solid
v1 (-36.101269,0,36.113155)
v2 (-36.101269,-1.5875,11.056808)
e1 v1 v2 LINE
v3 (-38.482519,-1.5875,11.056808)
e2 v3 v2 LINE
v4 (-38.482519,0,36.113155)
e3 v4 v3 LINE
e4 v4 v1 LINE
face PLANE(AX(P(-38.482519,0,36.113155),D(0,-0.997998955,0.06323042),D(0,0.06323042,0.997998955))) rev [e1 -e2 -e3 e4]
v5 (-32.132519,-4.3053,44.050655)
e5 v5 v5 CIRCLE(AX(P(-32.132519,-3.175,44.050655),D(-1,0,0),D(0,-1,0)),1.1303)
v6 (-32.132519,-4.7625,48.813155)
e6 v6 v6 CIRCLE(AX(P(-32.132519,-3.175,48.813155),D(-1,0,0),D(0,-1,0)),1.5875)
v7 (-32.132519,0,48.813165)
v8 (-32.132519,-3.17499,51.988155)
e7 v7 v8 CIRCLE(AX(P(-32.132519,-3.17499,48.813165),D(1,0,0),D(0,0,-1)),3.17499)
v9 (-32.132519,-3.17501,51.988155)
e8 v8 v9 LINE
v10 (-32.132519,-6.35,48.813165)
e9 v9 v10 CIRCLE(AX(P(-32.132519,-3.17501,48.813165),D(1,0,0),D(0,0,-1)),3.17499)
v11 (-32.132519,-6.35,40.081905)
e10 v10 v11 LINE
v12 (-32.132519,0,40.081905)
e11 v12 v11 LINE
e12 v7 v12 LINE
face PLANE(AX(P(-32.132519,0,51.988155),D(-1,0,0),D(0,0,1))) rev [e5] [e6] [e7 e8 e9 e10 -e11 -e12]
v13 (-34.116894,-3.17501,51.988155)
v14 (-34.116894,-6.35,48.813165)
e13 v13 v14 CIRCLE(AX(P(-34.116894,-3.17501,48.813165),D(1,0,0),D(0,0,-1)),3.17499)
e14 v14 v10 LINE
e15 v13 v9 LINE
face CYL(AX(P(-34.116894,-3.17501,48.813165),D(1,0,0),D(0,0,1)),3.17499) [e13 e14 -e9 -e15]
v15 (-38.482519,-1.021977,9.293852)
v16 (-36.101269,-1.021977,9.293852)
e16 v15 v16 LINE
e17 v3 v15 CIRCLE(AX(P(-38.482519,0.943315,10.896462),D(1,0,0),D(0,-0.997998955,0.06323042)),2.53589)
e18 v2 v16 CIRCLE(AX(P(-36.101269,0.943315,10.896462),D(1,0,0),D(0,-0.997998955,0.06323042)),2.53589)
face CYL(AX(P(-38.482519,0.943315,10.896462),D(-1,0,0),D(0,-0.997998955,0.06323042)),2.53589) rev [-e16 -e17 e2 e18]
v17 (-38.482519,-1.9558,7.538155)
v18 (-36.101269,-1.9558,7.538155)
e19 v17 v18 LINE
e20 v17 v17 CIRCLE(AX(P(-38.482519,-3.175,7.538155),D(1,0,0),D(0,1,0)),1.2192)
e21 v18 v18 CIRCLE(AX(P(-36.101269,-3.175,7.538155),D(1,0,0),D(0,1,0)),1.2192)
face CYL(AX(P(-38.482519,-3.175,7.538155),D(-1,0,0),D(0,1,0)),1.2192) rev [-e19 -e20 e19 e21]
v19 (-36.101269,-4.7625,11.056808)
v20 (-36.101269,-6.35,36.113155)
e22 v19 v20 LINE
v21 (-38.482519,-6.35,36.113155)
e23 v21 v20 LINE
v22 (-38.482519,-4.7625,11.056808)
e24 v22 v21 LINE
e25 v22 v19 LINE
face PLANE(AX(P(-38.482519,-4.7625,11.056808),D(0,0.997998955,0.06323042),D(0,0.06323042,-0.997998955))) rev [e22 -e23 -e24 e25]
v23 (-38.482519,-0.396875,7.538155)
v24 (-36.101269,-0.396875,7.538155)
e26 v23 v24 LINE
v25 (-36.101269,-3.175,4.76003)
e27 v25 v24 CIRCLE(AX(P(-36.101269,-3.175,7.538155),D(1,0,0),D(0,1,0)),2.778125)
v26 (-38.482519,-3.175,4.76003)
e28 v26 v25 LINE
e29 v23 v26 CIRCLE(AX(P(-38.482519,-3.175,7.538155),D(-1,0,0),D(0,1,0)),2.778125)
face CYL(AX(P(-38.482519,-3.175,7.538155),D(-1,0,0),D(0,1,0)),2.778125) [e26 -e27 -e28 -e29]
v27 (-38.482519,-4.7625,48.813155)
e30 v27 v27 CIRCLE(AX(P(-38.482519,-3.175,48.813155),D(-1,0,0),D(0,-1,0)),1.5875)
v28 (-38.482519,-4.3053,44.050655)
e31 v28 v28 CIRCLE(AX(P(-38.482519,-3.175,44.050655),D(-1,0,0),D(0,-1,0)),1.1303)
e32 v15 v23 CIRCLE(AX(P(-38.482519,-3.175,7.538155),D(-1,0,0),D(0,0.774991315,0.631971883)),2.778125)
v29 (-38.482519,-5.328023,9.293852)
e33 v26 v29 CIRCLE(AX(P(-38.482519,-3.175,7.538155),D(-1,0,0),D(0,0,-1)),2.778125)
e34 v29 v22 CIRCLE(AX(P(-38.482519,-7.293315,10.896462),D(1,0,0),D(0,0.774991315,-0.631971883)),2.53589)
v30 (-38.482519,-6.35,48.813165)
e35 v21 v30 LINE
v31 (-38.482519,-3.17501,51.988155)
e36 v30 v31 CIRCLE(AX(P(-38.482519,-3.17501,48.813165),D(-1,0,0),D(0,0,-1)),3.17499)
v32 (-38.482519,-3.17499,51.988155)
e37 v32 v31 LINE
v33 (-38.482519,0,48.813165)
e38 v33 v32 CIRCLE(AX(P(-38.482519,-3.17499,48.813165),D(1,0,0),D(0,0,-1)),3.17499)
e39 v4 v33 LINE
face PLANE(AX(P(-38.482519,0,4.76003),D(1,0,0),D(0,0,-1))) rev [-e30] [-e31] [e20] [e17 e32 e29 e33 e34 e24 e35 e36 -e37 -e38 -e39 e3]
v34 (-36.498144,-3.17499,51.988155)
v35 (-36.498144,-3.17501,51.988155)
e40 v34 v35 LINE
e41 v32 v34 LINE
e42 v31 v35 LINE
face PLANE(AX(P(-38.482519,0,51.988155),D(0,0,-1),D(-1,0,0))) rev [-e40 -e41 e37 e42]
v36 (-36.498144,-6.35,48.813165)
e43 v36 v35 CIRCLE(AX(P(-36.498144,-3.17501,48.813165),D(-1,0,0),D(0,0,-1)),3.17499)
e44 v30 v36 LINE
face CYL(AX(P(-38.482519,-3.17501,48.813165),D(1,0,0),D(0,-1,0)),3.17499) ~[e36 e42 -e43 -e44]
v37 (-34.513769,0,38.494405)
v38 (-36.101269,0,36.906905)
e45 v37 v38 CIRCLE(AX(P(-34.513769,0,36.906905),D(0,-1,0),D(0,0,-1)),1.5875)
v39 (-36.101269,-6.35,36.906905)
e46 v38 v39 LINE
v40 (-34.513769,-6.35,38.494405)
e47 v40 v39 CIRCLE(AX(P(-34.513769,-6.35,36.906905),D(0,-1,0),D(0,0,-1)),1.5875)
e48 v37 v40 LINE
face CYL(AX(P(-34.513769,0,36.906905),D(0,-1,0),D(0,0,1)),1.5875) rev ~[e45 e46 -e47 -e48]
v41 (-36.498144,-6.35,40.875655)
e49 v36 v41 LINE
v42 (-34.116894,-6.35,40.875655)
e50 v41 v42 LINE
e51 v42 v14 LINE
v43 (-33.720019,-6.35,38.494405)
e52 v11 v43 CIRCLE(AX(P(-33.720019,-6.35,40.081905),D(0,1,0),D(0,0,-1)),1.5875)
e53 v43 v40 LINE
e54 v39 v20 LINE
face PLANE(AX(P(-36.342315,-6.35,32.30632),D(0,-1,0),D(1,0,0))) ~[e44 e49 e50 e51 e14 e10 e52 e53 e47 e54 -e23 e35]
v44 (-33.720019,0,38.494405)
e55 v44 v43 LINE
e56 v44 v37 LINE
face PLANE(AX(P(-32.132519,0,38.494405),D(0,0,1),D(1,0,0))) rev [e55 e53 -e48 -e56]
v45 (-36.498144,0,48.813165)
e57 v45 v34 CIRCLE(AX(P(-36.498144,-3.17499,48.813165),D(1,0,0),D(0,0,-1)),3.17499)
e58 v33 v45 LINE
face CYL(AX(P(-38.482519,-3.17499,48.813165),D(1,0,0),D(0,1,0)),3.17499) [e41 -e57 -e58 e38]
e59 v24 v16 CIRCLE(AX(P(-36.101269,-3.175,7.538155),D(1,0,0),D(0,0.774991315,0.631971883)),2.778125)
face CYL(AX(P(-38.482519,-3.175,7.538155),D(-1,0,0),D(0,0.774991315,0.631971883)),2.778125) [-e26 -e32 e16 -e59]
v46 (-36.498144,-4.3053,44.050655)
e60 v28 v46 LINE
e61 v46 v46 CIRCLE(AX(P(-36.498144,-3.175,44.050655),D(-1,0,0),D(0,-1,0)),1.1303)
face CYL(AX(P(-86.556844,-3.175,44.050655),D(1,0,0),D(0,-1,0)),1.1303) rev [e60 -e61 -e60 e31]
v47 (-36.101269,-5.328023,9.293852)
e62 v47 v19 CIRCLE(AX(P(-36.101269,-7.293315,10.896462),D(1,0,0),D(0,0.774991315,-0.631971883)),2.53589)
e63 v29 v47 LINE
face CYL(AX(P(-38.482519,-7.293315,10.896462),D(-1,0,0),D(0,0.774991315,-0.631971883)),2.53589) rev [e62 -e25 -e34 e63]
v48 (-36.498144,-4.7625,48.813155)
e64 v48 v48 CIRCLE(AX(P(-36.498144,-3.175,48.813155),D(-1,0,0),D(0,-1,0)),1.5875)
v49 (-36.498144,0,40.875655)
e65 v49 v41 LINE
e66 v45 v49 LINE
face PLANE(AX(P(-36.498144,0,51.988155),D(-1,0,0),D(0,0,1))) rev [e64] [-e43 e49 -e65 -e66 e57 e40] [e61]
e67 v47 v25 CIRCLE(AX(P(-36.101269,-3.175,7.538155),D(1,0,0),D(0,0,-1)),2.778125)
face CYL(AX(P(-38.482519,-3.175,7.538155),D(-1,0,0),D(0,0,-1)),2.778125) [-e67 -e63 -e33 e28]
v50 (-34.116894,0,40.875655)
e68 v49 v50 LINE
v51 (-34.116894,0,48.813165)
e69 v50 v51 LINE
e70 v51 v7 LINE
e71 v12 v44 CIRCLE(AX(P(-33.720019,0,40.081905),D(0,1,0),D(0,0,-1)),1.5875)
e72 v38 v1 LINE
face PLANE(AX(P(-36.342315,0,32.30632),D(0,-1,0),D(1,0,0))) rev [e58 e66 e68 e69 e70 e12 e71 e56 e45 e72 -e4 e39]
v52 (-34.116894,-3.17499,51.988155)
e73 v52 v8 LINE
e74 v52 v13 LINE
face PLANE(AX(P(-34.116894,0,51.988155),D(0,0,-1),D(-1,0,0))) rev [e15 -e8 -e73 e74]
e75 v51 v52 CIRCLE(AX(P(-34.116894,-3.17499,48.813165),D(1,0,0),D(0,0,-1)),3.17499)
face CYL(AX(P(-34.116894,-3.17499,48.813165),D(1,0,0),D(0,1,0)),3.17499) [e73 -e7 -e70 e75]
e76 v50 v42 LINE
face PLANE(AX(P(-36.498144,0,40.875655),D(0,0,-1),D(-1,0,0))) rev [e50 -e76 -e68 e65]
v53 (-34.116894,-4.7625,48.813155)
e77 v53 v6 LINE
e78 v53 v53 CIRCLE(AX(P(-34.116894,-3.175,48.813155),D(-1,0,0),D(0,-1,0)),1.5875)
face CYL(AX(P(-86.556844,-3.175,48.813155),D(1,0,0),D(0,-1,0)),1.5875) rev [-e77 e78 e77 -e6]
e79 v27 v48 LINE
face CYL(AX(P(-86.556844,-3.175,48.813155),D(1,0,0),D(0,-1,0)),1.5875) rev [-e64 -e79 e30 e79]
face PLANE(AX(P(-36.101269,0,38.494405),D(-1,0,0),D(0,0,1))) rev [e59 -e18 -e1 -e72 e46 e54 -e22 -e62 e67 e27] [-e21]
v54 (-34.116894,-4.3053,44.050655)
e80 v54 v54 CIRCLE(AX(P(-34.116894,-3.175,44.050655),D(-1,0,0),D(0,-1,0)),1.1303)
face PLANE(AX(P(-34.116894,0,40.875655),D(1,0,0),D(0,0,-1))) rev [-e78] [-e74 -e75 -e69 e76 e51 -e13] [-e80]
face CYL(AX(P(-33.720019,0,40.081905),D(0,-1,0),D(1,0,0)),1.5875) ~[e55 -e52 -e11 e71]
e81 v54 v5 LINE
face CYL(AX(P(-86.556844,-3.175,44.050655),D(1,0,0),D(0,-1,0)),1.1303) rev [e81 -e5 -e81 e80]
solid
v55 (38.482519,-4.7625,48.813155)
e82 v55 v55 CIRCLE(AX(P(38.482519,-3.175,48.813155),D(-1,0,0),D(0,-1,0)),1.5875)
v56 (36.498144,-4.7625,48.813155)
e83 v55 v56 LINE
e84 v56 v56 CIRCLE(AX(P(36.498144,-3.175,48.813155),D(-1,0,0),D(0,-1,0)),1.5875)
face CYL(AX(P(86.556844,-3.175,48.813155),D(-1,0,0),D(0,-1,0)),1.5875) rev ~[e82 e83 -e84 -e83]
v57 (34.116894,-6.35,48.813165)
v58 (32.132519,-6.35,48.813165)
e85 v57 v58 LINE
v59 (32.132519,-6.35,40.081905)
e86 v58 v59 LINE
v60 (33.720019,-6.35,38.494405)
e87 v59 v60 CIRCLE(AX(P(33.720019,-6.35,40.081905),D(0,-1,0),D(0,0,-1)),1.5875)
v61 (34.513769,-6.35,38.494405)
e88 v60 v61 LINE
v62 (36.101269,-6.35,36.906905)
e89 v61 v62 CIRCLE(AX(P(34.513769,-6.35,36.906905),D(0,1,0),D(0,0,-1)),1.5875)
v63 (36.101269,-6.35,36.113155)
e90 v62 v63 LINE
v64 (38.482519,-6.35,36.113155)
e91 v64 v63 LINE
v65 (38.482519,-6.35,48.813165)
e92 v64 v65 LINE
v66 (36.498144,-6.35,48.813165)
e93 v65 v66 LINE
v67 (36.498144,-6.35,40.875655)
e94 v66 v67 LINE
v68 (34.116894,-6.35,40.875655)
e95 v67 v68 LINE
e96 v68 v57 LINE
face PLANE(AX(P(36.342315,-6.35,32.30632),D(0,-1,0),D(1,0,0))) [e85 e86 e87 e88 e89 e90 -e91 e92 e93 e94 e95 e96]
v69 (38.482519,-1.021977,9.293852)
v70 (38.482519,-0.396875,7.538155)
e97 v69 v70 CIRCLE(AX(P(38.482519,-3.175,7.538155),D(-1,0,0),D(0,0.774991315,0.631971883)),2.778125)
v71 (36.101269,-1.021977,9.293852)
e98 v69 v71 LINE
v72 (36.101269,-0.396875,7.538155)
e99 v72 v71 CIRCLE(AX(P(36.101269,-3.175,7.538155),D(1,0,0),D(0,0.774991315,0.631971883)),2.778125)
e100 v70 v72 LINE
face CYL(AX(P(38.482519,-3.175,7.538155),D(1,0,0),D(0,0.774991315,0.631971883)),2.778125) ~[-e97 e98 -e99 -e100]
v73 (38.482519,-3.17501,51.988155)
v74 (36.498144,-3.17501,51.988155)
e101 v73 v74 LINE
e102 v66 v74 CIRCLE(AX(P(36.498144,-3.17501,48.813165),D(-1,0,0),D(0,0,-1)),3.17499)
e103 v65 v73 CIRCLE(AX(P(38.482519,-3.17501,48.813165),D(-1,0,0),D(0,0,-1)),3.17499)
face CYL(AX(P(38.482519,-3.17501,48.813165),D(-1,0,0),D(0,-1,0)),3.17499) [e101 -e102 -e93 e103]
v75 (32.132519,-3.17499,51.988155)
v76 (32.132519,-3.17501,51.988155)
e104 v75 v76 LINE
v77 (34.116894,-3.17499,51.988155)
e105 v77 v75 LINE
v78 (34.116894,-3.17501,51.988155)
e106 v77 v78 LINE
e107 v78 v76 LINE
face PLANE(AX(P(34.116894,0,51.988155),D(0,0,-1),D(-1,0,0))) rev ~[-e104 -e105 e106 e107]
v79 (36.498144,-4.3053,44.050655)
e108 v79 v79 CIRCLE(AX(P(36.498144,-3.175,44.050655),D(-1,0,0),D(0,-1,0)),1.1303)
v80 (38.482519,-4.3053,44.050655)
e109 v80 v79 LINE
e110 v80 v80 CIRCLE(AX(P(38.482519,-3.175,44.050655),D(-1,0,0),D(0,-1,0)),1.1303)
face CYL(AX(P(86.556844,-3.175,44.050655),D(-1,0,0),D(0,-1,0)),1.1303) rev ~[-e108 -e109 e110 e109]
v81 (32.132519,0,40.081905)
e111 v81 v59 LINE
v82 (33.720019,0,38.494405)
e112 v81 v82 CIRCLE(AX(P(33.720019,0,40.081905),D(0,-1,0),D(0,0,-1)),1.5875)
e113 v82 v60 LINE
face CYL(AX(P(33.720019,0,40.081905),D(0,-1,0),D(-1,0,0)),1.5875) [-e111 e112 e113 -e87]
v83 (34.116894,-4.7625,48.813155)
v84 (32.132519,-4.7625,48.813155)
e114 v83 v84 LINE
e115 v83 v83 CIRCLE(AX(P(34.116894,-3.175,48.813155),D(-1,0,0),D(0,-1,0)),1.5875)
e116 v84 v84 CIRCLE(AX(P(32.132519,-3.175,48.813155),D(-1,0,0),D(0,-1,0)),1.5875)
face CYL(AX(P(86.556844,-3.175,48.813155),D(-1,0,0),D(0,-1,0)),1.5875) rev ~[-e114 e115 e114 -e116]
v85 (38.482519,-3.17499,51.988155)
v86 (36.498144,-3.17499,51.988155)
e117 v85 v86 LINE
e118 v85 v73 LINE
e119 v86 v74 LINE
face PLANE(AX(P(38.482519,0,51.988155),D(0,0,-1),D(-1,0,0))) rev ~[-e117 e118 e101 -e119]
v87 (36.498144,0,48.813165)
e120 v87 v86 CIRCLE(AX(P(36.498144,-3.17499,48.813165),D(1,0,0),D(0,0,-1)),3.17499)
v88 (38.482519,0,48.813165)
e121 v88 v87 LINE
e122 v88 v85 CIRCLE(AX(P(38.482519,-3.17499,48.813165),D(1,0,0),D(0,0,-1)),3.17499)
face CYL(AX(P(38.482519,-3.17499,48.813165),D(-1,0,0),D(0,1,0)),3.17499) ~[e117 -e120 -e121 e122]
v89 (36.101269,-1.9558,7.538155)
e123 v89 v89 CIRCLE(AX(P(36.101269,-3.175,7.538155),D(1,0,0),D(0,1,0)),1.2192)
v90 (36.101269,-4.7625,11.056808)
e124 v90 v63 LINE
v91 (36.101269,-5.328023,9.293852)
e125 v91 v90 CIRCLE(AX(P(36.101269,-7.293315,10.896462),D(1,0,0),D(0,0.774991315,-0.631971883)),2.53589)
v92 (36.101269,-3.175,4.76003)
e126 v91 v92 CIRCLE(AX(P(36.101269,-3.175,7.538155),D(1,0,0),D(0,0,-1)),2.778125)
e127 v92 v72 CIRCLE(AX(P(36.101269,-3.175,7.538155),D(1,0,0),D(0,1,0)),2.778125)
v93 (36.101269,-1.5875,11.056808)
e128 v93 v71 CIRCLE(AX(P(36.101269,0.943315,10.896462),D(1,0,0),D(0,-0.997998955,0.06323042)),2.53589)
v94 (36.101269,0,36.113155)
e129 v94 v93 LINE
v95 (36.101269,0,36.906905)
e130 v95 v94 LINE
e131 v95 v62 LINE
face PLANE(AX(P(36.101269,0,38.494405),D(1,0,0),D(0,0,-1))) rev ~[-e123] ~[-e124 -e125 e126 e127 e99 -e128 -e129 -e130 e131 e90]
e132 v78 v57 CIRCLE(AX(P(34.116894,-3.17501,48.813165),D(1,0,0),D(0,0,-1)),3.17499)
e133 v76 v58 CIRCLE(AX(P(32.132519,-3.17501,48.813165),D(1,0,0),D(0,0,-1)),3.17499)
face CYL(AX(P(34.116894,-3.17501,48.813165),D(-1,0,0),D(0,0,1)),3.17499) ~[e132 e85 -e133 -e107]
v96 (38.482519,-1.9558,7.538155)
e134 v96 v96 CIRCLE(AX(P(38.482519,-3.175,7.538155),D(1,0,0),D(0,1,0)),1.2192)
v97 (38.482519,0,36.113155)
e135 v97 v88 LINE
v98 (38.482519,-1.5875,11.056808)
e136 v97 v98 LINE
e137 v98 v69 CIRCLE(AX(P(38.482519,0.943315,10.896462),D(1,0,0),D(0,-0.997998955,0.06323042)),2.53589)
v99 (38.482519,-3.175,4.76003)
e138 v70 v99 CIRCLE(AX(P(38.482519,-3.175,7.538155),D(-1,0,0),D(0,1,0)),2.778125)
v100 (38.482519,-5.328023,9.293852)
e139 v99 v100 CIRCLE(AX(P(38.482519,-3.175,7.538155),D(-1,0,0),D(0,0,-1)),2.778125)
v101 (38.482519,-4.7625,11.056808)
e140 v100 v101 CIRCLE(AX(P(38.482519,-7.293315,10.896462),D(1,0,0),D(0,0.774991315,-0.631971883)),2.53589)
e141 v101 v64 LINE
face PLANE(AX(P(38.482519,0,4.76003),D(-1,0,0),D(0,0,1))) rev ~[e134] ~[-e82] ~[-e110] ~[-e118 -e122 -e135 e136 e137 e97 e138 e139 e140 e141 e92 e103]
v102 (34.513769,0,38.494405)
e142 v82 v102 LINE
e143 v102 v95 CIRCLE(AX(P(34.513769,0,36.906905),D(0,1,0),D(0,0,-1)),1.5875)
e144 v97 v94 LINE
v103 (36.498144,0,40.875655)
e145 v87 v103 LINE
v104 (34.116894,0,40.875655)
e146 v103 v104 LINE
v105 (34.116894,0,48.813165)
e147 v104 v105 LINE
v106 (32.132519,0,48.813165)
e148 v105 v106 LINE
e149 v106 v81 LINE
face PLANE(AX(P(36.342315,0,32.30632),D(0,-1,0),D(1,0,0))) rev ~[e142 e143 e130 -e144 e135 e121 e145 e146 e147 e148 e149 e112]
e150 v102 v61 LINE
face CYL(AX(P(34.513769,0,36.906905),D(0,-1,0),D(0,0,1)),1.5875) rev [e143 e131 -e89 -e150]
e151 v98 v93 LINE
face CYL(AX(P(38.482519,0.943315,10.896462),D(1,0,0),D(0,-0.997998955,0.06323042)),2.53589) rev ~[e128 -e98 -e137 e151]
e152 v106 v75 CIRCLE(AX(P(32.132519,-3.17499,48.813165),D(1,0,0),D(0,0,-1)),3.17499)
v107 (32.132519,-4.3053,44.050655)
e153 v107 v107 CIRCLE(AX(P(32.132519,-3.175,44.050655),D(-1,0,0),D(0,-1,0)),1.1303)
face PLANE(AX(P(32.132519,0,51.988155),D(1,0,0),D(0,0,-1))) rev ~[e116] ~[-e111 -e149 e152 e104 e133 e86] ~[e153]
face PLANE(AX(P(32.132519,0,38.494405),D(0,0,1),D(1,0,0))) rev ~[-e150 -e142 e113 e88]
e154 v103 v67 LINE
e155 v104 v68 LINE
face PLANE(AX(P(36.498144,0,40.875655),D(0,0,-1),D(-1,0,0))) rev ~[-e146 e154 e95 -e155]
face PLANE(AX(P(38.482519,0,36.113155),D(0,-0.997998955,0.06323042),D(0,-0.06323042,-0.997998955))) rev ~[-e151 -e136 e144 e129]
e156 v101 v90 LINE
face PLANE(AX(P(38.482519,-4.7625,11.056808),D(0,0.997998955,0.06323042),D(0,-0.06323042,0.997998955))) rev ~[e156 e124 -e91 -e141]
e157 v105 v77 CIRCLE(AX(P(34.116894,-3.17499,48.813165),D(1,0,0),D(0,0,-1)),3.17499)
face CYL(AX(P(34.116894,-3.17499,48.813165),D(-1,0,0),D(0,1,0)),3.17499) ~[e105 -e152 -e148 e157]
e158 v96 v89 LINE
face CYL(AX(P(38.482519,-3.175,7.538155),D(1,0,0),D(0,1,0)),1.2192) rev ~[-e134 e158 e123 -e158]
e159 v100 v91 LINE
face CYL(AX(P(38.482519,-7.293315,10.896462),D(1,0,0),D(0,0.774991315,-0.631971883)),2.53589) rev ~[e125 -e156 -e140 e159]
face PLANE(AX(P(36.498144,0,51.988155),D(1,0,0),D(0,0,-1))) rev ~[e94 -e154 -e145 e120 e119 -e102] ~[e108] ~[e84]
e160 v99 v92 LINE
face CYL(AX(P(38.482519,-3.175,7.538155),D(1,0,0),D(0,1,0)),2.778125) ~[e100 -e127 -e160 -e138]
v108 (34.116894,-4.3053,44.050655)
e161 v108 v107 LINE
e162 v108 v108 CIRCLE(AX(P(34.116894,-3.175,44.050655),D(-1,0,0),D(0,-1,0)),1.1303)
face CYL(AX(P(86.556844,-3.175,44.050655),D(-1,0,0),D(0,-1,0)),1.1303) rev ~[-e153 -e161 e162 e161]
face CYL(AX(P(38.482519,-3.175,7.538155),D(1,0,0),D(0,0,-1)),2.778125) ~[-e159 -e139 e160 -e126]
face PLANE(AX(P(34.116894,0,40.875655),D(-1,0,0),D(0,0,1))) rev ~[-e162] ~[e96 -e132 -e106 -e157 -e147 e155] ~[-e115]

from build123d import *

# Parameters (mm, degrees)
F1_DEPTH = 6.35
F2_R     = 1.5875
F3_R     = 3.17499
F5_D     = 3.175
F7_D     = 2.2606
F8_R     = 1.2192
F9_DEPTH = 25.4


# Not quite as in the source:
# - a fillet or chamfer is up to 0.001 mm smaller than in the source, because OpenCascade refuses the exact size


with BuildPart() as f1:
    # F0 (on Front) → F1 (new body)
    with BuildSketch(Plane.XZ):
        Polygon((36.1012686809, 4.7600296621), (38.4825186809, 4.7600296621), (38.4825186809, 51.9881546621), (36.4981436809, 51.9881546621), (36.4981436809, 40.8756546621), (34.1168936809, 40.8756546621), (34.1168936809, 51.9881546621), (32.1325186809, 51.9881546621), (32.1325186809, 38.4944046621), (36.1012686809, 38.4944046621), align=None)
    extrude(amount=F1_DEPTH)

    # F2
    f2_edges = [f1.edges().sort_by_distance(p)[0] for p in [
        (36.101269, -3.175, 38.494405),
        (32.132519, -3.175, 38.494405),
    ]]
    fillet(f2_edges, radius=F2_R)

    # F3 (radius 3.175 in the source; OpenCascade refuses exactly that, so slightly less here)
    f3_edges = [f1.edges().sort_by_distance(p)[0] for p in [
        (33.124706, -6.35, 51.988155),
        (33.124706, 0, 51.988155),
        (37.490331, 0, 51.988155),
        (37.490331, -6.35, 51.988155),
    ]]
    fillet(f3_edges, radius=F3_R)

    # F5 (through all)
    with Locations(Plane.YZ.offset(38.4825186809)):
        with Locations((-3.175, 48.8131546621)):
            Hole(F5_D / 2)

    # F7 (through all)
    with Locations(Plane.YZ.offset(38.4825186809)):
        with Locations((-3.175, 44.0506546621)):
            Hole(F7_D / 2)

    # F8 (on face) → F9 (cut)
    with BuildSketch(Plane.YZ.offset(38.4825186809)):
        Polygon((-6.35, 11.0568078235), (-4.7625, 11.0568078235), (-6.35, 36.1131546621), align=None)
        with BuildLine():
            Line((-6.35, 4.7600296621), (-3.175, 4.7600296621))
            ThreePointArc((-3.175, 4.7600296621), (-5.684534213, 6.3464262746), (-5.3280227481, 9.2938515499))
            ThreePointArc((-5.3280227481, 9.2938515499), (-4.8786206586, 10.1218745235), (-4.7625, 11.0568078235))
            Line((-4.7625, 11.0568078235), (-6.35, 11.0568078235))
            Line((-6.35, 11.0568078235), (-6.35, 4.7600296621))
        make_face()
        with Locations((-3.175, 7.5381546621)):
            Circle(F8_R)
        with BuildLine():
            ThreePointArc((-1.0219772519, 9.2938515499), (-0.5578121163, 8.4699840975), (-0.396875, 7.5381546621))
            ThreePointArc((-0.396875, 7.5381546621), (-1.2105689735, 5.5737236356), (-3.175, 4.7600296621))
            Line((-3.175, 4.7600296621), (0, 4.7600296621))
            Line((0, 4.7600296621), (0, 11.0568078235))
            Line((0, 11.0568078235), (-1.5875, 11.0568078235))
            ThreePointArc((-1.5875, 11.0568078235), (-1.4713793414, 10.1218745235), (-1.0219772519, 9.2938515499))
        make_face()
        Polygon((0, 36.1131546621), (-1.5875, 11.0568078235), (0, 11.0568078235), align=None)
    extrude(amount=-F9_DEPTH, mode=Mode.SUBTRACT)


with BuildPart() as f11_1:
    # F11: instance of F1
    add(f1.part.mirror(Plane.YZ))


solid = Compound([f1.part, f11_1.part])
